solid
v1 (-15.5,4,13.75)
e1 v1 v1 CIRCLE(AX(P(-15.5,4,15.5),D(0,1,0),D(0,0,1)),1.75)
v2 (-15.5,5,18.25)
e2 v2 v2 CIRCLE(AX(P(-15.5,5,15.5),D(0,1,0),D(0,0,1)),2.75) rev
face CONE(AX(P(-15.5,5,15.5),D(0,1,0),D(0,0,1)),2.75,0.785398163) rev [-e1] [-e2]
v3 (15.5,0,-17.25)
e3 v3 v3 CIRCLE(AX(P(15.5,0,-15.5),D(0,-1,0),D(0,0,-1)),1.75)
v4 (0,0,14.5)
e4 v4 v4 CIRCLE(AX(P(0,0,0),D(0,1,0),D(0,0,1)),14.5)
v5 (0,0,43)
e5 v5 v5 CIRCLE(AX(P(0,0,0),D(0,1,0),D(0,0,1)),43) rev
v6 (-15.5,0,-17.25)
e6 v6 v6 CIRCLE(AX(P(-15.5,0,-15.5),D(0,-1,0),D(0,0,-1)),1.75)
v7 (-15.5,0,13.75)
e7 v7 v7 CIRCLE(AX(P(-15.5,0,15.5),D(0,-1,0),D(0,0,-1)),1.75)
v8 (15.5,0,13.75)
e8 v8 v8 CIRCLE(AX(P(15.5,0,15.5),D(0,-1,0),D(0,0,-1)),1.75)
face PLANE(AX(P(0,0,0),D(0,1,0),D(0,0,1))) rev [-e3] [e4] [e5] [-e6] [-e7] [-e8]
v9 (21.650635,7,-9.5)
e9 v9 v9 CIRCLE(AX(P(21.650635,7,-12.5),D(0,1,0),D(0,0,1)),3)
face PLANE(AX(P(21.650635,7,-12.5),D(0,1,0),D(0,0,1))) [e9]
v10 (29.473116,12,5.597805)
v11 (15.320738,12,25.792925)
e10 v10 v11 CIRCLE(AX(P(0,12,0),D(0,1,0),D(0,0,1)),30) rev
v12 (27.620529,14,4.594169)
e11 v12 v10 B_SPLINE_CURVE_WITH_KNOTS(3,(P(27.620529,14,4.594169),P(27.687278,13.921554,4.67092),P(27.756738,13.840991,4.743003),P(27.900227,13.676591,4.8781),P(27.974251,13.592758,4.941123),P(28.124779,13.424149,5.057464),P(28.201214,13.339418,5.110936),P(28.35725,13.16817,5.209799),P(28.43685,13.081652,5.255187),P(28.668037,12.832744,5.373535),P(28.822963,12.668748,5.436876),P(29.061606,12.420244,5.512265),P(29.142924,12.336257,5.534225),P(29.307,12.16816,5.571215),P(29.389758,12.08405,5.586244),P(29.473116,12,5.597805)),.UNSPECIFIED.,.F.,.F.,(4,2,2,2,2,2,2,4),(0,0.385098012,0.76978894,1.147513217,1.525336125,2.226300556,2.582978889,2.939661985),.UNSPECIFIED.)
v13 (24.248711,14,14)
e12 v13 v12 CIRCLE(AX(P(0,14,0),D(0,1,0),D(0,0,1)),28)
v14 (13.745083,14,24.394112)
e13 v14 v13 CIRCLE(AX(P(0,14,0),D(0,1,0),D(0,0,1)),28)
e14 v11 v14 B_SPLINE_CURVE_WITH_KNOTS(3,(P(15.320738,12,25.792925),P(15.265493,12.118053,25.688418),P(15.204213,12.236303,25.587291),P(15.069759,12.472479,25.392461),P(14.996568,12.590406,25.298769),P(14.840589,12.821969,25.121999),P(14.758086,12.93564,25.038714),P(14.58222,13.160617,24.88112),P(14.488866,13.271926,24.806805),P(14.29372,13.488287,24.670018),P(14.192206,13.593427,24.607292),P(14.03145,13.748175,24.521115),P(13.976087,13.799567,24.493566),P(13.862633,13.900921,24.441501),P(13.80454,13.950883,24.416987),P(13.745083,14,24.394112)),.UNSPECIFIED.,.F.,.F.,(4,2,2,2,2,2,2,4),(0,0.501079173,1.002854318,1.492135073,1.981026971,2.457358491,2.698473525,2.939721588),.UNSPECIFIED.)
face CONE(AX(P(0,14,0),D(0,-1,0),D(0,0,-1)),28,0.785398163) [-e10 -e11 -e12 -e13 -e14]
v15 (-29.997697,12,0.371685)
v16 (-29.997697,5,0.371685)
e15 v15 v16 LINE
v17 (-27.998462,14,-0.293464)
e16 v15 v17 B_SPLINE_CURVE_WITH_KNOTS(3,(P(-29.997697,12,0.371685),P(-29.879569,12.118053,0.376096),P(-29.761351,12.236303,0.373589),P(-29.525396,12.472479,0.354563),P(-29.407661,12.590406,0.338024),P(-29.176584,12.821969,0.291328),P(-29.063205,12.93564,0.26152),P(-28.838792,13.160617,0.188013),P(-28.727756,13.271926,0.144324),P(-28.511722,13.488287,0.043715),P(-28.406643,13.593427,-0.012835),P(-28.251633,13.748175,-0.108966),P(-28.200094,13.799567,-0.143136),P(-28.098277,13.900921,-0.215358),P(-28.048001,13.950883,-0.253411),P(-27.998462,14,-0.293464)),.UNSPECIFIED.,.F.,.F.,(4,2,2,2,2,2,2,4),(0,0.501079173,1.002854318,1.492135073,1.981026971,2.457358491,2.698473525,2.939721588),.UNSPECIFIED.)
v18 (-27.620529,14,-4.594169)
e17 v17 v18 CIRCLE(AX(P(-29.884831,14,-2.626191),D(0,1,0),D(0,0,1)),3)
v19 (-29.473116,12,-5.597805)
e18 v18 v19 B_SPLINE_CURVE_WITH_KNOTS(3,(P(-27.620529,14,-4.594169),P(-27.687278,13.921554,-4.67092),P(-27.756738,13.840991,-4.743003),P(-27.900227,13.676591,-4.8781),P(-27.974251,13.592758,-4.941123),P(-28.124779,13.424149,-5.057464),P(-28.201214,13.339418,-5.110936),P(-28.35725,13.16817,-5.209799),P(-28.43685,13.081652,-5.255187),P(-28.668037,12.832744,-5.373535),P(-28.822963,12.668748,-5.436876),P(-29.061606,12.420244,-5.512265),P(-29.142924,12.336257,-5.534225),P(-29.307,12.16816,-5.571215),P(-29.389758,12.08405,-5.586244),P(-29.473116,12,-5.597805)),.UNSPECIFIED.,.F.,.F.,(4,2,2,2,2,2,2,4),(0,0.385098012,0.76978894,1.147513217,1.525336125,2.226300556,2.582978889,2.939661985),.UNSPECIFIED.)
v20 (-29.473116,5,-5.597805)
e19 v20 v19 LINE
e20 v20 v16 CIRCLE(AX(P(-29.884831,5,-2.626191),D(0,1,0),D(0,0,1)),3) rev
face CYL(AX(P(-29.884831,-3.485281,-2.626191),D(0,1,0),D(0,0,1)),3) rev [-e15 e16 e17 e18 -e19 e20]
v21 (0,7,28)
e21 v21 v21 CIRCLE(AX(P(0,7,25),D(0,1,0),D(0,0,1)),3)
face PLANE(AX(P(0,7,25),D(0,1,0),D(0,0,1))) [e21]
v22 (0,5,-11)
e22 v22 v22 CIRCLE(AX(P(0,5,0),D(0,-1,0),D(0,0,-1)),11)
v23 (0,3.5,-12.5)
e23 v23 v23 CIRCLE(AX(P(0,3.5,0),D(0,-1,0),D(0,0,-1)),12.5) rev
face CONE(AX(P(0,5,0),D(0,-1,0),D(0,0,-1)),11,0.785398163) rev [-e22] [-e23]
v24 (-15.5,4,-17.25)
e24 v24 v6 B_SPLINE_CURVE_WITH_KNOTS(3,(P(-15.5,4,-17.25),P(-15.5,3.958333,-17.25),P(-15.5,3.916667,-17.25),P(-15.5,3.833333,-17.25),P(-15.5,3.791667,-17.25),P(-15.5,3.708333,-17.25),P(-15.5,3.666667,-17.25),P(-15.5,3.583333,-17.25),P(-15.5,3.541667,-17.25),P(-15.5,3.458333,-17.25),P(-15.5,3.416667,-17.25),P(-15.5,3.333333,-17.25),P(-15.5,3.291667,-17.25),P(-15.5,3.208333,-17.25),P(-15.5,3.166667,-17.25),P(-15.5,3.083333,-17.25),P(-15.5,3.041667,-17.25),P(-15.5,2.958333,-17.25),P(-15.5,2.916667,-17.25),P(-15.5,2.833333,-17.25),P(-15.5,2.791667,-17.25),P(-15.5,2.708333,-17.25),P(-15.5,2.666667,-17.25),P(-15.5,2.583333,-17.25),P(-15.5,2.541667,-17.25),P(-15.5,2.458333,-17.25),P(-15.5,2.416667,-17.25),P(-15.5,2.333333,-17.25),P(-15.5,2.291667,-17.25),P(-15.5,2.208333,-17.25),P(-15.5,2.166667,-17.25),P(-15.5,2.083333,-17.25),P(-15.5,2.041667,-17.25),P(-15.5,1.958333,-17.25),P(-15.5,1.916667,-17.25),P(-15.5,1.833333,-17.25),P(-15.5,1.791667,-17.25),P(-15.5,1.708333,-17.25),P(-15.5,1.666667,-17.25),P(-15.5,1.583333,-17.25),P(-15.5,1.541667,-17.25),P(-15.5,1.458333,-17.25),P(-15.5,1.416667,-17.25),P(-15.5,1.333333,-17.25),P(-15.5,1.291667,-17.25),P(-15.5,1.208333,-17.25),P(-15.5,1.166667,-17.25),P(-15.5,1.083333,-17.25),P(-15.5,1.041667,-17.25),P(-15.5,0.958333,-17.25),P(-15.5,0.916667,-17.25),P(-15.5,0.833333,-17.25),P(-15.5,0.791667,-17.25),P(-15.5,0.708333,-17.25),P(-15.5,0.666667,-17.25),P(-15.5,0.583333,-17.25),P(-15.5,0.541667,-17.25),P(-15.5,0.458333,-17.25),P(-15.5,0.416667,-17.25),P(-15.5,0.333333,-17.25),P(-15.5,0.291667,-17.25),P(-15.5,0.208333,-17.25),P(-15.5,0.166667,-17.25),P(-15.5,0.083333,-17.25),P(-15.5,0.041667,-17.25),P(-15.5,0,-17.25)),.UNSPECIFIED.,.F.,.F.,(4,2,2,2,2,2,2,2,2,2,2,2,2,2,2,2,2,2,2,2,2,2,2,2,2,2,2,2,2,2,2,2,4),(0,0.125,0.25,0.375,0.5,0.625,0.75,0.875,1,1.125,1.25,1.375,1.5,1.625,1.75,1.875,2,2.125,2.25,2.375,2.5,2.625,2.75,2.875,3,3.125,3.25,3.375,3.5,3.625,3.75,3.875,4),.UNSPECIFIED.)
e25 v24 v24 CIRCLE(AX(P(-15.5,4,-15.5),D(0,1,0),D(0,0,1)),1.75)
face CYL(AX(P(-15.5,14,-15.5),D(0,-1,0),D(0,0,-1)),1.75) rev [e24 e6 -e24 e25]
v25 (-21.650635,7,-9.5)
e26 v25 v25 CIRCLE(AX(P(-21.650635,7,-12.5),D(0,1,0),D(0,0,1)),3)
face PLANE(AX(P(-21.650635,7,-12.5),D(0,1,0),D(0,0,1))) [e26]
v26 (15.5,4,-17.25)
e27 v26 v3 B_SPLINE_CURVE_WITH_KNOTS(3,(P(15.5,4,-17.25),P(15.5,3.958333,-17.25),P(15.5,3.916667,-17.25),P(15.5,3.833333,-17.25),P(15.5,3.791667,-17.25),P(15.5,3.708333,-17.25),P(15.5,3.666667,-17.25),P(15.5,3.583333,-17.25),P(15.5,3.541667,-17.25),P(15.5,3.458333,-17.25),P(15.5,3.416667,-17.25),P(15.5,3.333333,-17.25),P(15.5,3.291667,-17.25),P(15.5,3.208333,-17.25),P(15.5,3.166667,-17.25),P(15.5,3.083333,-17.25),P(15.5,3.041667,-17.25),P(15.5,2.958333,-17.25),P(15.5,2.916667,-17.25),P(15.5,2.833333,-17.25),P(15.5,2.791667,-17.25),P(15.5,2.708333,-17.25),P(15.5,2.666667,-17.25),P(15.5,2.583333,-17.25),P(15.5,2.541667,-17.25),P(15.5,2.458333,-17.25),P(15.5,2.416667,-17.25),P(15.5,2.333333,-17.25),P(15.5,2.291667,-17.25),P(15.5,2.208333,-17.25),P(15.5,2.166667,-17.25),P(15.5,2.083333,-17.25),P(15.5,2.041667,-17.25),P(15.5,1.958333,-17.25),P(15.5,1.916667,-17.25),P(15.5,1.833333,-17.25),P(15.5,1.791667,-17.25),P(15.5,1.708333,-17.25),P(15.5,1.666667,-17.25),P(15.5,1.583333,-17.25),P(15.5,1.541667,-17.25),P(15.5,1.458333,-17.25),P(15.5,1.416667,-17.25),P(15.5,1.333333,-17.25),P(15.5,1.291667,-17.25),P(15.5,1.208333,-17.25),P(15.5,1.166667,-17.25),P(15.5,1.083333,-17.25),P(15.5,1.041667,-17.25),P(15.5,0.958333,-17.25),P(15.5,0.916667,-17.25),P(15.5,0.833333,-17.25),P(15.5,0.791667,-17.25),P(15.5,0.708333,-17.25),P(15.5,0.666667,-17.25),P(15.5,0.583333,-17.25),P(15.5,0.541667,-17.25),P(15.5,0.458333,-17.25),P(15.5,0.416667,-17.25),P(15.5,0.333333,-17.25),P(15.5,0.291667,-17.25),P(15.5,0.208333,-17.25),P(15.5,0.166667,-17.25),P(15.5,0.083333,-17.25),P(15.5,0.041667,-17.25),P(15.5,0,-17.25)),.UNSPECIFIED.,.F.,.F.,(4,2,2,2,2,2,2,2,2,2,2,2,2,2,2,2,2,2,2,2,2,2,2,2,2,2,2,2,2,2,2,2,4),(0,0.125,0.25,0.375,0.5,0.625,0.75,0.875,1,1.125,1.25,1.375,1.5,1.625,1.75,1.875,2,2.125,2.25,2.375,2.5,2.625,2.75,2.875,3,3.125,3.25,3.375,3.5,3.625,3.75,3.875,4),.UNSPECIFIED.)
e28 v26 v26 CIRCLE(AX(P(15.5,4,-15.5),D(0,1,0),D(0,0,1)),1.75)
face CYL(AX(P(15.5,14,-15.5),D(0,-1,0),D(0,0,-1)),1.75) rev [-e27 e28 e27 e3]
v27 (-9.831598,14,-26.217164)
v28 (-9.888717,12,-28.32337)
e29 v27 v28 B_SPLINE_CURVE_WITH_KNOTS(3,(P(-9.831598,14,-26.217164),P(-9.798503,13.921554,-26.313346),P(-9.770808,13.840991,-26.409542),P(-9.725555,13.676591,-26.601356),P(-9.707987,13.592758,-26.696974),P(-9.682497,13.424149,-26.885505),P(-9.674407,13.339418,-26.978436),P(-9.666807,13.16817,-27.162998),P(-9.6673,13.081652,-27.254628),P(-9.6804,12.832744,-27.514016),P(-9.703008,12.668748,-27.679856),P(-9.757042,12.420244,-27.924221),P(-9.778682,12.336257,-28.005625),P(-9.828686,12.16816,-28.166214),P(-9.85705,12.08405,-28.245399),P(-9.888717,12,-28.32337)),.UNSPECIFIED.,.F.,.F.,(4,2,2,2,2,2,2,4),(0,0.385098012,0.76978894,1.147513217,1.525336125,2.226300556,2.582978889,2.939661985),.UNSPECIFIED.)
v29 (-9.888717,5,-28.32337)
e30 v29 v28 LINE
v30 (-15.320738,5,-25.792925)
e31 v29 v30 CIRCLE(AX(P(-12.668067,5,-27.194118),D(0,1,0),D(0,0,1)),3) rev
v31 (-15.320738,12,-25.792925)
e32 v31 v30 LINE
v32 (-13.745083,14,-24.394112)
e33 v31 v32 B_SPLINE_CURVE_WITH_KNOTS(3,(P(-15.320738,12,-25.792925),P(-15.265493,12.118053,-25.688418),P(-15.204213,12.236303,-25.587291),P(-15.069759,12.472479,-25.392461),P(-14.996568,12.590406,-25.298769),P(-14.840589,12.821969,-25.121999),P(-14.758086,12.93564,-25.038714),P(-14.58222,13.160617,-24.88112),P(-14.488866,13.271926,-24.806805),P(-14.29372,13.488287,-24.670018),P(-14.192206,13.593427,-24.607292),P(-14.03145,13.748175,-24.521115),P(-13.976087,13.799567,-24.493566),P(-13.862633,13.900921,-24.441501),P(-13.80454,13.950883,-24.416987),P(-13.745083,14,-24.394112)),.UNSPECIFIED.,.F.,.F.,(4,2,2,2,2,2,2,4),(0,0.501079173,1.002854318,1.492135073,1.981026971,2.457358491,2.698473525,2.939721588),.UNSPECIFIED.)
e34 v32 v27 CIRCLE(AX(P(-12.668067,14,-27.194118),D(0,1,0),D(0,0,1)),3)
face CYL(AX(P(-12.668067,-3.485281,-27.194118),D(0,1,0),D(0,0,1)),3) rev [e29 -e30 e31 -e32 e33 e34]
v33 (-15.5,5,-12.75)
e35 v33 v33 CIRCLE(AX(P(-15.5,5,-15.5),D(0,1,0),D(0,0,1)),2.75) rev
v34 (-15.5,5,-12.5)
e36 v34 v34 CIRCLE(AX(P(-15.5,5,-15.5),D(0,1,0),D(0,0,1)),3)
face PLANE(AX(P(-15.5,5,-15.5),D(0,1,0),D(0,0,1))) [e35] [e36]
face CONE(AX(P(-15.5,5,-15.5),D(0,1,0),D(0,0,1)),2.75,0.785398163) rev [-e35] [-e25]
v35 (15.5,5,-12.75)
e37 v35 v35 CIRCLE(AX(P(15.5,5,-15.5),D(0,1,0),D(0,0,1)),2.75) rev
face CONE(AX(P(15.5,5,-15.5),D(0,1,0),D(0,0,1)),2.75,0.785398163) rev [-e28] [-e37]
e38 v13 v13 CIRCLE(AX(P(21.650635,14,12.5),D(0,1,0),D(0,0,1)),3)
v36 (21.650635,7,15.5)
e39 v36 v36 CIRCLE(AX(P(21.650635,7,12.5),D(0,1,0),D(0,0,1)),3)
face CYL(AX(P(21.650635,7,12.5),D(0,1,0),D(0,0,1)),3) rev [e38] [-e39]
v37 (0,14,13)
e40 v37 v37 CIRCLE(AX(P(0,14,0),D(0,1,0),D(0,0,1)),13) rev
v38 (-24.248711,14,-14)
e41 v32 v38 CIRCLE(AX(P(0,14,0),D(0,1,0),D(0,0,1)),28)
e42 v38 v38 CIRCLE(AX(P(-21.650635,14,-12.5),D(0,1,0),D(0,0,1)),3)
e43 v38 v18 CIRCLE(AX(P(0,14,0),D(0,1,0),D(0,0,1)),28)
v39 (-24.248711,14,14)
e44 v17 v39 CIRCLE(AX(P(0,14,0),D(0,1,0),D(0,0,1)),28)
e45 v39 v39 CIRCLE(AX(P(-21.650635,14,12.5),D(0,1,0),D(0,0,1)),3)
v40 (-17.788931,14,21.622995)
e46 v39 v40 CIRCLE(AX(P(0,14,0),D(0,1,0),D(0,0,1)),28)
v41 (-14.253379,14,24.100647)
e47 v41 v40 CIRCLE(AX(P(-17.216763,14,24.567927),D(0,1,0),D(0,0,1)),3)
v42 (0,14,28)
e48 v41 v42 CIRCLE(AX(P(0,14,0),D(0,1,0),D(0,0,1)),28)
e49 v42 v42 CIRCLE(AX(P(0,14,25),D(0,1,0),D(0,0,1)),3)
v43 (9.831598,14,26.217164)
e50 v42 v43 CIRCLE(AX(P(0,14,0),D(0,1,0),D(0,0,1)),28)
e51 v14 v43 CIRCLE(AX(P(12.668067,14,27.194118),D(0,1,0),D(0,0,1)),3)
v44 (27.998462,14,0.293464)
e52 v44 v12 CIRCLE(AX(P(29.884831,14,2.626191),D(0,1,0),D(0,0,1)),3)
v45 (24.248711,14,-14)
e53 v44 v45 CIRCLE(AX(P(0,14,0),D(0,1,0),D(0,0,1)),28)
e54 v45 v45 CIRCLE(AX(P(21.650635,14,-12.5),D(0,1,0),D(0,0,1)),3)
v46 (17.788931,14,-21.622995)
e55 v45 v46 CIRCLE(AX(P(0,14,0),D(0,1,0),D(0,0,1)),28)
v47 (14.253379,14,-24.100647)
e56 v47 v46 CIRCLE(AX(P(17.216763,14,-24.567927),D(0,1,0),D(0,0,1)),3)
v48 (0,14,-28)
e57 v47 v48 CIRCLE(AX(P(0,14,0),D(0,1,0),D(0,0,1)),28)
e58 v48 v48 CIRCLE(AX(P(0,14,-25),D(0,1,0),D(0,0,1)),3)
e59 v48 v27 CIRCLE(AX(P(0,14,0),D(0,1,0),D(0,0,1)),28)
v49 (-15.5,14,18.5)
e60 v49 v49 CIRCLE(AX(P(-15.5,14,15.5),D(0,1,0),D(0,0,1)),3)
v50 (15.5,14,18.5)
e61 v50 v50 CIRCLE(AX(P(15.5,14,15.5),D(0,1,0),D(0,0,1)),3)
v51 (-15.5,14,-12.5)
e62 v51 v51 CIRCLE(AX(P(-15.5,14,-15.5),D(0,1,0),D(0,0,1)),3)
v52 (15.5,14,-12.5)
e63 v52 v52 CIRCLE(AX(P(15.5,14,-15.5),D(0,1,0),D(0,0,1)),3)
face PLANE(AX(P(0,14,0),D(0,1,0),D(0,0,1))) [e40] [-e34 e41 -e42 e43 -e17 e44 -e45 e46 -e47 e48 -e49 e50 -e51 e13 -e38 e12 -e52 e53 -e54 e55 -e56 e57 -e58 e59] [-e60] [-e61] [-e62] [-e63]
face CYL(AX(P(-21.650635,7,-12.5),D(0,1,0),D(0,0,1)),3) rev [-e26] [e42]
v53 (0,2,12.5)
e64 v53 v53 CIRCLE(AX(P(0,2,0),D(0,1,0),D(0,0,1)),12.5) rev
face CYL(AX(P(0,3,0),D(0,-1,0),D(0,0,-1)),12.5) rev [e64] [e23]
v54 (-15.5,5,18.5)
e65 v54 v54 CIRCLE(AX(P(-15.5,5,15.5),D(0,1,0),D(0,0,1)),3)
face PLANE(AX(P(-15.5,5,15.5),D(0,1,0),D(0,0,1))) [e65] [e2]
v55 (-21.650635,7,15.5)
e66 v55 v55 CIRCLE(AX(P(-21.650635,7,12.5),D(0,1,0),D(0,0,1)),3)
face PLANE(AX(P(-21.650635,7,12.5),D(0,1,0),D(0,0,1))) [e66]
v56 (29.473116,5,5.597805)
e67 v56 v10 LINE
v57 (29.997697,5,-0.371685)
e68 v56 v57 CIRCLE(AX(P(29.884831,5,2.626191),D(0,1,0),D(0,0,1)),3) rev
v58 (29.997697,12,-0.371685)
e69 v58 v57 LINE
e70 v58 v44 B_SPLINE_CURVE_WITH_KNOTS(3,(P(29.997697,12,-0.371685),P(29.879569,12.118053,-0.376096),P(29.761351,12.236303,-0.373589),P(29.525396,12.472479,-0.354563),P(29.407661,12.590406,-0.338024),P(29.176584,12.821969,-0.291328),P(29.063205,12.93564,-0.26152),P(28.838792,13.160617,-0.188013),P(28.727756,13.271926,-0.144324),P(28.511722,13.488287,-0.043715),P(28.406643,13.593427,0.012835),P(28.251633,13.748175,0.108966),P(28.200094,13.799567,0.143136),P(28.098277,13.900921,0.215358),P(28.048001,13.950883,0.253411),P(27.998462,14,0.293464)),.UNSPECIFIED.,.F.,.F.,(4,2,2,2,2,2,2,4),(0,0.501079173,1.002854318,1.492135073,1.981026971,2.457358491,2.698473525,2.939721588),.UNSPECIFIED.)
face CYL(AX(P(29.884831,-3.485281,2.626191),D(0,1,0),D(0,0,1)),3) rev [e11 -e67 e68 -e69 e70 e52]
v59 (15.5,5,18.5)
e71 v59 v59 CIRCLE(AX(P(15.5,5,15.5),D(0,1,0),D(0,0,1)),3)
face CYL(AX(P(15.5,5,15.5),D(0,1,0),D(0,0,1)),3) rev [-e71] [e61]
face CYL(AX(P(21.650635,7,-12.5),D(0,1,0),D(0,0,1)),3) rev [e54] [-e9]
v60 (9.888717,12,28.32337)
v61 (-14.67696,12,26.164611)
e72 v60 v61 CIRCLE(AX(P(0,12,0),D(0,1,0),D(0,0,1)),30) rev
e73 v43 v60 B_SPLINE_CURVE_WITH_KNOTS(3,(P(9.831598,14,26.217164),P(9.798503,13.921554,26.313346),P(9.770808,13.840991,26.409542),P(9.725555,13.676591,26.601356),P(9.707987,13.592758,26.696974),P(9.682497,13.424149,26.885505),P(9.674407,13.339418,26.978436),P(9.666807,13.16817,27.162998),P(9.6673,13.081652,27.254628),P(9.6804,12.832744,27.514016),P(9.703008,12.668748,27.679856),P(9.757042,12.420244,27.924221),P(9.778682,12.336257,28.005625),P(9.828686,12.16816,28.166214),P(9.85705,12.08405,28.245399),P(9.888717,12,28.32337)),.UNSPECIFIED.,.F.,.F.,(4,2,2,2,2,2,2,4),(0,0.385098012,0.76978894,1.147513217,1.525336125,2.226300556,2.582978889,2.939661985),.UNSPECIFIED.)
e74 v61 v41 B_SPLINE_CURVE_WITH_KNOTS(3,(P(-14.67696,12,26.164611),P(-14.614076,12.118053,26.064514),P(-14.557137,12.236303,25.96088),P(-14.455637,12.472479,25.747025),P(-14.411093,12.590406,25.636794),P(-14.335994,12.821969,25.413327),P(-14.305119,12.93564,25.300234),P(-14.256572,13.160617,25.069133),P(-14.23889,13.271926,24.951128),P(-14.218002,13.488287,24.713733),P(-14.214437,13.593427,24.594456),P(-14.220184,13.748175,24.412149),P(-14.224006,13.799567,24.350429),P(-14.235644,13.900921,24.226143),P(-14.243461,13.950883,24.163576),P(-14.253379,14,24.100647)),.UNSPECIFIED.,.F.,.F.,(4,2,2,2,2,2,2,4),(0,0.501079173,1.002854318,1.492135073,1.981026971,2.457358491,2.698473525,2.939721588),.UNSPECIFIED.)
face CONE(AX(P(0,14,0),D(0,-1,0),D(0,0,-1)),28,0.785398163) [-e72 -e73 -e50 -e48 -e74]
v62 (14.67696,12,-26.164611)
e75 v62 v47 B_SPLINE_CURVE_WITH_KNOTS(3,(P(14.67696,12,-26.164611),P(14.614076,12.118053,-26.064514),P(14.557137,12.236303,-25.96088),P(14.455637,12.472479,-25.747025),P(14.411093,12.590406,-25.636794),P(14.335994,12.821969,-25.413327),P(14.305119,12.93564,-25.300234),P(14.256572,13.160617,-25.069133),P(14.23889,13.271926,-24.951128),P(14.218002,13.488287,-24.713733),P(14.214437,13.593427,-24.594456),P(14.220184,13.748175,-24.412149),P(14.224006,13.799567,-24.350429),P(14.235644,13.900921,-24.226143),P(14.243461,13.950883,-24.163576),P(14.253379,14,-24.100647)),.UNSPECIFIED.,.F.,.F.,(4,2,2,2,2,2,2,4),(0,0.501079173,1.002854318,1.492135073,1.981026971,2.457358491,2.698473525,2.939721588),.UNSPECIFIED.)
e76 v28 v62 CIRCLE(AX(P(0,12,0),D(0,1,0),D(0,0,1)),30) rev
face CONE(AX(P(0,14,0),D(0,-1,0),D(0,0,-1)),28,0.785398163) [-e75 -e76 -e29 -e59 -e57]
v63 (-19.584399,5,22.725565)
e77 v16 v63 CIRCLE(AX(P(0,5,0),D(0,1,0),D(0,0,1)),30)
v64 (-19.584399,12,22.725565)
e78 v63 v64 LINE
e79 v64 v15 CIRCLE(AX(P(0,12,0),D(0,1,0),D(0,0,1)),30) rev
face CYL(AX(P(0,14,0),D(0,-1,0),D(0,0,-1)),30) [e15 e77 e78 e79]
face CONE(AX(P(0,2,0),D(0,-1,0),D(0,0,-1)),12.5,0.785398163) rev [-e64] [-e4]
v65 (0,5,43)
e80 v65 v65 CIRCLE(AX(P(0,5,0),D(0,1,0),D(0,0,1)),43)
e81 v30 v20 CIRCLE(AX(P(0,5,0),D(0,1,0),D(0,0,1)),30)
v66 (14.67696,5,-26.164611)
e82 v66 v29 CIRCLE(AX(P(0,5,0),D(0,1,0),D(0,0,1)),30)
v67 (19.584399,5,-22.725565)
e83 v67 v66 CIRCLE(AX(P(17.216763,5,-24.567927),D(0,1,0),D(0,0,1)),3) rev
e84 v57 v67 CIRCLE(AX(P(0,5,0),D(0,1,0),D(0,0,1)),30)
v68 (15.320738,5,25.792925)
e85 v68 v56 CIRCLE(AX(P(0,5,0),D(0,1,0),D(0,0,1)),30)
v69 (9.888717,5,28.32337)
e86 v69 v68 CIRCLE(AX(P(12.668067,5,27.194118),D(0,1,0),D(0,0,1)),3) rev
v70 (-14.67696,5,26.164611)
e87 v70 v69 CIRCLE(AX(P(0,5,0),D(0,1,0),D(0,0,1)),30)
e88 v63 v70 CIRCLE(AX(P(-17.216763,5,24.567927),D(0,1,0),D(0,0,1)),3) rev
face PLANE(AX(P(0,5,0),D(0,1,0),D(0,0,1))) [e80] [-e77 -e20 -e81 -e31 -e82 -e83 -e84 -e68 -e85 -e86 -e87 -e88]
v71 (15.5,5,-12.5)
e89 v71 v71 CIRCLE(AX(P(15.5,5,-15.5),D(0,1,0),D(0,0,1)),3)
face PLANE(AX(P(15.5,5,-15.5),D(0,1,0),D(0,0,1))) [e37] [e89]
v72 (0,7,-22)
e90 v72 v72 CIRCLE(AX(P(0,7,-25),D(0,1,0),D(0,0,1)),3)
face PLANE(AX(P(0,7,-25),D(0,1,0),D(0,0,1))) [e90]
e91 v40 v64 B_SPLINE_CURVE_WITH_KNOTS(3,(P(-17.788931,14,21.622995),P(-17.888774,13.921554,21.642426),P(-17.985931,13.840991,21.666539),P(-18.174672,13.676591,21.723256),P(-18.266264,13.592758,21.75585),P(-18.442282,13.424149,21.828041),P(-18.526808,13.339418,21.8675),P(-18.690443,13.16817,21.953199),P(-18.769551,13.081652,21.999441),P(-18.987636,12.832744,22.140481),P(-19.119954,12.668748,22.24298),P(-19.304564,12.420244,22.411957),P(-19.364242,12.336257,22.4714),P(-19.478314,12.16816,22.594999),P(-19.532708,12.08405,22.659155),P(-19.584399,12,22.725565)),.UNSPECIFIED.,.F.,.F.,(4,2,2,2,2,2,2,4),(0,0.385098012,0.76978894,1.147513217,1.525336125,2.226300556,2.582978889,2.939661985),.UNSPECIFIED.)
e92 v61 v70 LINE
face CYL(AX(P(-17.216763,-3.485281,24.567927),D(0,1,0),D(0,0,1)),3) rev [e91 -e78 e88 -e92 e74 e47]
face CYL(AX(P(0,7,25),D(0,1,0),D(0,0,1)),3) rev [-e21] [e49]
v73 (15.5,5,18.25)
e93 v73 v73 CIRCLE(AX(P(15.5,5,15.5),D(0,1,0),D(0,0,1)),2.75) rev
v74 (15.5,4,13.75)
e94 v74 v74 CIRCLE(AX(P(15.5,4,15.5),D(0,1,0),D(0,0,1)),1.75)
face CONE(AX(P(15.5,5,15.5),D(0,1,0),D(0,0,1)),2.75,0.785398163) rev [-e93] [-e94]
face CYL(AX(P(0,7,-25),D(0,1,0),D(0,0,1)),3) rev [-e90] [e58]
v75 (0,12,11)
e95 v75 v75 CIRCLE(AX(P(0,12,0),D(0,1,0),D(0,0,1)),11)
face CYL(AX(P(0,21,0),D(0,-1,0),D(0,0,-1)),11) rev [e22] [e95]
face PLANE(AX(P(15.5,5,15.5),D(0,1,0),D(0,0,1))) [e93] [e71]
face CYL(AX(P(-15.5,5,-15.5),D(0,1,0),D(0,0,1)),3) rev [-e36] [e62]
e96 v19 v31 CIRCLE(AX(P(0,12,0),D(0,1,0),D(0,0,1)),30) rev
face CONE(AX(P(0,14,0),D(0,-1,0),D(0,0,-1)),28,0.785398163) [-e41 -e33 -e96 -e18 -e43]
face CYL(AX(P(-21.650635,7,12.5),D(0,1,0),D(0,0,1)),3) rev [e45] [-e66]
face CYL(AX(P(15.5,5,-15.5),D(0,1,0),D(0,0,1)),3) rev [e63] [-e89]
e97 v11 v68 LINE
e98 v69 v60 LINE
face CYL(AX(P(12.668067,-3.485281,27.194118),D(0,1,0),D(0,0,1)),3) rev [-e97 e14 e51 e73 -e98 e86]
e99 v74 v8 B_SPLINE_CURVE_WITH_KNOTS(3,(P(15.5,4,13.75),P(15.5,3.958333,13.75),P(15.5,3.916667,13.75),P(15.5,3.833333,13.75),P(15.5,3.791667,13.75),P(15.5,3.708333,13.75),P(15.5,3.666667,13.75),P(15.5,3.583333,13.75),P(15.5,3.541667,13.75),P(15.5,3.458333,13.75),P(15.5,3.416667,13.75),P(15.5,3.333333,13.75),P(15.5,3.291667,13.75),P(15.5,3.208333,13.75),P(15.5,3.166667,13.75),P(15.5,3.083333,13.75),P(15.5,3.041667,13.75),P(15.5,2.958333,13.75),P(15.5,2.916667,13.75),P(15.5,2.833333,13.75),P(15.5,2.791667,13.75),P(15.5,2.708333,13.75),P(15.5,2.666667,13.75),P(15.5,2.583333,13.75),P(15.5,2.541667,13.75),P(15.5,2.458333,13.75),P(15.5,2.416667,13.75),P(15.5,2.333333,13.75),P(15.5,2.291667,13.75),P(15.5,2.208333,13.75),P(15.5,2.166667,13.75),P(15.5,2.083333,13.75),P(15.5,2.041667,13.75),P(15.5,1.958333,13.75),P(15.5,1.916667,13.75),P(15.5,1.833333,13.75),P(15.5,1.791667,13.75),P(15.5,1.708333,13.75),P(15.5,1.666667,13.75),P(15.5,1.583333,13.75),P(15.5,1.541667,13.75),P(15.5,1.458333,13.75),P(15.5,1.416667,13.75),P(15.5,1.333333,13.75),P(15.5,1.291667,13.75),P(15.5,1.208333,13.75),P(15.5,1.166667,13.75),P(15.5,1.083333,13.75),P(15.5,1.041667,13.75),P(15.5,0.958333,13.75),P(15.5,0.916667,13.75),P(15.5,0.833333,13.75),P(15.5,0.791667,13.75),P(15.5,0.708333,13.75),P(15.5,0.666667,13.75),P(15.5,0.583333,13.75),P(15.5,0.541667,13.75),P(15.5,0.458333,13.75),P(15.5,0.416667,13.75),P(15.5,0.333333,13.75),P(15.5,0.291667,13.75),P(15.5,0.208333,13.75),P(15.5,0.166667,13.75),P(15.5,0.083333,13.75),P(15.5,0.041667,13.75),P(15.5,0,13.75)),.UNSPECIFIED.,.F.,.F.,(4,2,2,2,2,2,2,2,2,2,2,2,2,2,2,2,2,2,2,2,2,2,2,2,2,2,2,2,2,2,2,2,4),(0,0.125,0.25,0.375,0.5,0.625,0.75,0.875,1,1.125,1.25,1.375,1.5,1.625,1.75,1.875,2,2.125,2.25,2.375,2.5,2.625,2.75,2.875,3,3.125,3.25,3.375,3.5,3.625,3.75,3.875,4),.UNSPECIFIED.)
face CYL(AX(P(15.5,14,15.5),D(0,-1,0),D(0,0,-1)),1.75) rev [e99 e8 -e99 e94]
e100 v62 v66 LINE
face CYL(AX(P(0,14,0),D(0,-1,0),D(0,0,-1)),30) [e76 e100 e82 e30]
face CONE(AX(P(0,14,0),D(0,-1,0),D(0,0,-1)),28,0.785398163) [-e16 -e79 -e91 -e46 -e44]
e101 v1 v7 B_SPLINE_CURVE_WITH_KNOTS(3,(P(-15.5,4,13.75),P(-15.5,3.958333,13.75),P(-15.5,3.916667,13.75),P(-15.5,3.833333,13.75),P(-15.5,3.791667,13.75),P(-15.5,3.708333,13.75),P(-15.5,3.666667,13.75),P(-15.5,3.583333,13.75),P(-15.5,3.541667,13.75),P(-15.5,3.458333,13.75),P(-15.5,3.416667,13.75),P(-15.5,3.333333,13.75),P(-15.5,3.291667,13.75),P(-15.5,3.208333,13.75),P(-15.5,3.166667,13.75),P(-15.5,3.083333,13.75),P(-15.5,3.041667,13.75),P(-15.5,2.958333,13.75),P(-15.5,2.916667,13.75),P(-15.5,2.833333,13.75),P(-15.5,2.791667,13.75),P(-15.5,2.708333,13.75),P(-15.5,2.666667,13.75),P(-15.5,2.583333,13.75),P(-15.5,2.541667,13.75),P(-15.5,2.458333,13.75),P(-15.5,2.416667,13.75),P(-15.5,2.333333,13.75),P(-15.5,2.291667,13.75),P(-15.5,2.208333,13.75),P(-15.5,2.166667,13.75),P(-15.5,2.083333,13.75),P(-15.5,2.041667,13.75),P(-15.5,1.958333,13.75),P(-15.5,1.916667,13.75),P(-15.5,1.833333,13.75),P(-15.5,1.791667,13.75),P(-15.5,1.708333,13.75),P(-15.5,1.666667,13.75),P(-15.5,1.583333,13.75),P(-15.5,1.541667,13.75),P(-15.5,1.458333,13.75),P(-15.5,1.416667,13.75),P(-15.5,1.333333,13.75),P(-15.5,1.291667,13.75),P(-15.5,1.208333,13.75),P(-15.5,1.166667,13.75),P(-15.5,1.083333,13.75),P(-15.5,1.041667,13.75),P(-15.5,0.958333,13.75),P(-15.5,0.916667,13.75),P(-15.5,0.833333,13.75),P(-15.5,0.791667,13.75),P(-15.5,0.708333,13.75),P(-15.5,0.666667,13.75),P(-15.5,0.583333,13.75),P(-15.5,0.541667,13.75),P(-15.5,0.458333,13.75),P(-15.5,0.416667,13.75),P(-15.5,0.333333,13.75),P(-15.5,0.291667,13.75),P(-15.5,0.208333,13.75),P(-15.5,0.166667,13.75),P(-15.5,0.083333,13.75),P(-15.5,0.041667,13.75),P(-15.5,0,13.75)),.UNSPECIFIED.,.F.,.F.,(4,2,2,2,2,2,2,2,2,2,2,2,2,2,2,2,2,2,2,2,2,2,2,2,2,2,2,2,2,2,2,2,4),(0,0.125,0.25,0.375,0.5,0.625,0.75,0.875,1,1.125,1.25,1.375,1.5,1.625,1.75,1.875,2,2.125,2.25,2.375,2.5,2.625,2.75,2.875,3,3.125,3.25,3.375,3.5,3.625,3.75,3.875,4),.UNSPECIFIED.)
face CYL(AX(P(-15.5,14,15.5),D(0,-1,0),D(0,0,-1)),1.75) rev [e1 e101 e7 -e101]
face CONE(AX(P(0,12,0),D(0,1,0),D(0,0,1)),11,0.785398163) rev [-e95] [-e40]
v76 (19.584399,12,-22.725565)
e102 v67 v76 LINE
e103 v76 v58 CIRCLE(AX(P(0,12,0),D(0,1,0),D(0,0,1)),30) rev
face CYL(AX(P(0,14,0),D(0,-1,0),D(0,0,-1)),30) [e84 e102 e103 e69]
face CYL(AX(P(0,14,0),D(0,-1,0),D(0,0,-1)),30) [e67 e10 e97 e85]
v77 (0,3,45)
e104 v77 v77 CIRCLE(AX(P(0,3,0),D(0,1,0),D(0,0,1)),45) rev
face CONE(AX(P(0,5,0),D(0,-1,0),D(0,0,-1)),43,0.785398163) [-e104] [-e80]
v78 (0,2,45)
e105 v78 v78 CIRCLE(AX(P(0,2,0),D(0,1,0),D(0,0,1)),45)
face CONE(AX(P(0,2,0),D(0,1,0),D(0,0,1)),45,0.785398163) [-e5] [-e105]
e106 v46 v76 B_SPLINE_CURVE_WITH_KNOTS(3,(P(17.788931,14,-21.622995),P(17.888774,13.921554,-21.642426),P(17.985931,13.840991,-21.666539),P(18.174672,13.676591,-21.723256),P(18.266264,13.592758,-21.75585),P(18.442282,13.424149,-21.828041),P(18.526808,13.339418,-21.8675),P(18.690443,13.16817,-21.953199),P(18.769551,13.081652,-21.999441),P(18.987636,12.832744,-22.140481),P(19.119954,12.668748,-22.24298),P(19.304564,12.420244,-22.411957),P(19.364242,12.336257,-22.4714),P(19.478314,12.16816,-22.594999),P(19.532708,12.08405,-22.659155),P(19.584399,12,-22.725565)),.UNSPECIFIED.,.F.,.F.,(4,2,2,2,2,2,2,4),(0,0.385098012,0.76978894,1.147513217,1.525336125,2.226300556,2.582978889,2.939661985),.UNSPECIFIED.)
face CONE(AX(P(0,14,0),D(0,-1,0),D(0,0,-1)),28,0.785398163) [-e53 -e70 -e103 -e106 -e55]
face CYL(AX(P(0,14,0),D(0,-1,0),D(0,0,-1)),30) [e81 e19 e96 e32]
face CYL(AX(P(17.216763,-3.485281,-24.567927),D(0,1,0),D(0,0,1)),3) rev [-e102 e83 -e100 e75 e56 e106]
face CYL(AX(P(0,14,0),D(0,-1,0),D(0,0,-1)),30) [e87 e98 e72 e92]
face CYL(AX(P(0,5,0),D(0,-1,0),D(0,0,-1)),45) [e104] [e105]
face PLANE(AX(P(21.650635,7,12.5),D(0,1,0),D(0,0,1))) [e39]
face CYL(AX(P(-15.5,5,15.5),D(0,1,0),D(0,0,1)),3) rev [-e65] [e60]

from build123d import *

# Parameters (mm, degrees)
SKETCH1_R           = 45
BOSS_EXTRUDE1_DEPTH = 5
SKETCH2_R           = 30
BOSS_EXTRUDE2_DEPTH = 9
CUT_EXTRUDE1_DEPTH  = 66.16133823057964
SKETCH4_R           = 12.5
CUT_EXTRUDE2_DEPTH  = 3
SKETCH5_R           = 11
CUT_EXTRUDE3_DEPTH  = 18.000000000000004
SKETCH10_R          = 2.9999999999999996
SKETCH10_R_2        = 2.999999999999998
SKETCH10_R_3        = 3.0000000000000004
SKETCH10_R_4        = 2.9999999999999982
SKETCH10_R_5        = 2.999999999999999
CUT_EXTRUDE4_DEPTH  = 7
SKETCH11_R          = 2.9999999999942024
SKETCH11_R_2        = 2.999999999999999
SKETCH11_R_3        = 3.000000000009364
SKETCH11_R_4        = 3.000000000013015
SKETCH11_R_5        = 3.000000000007377
SKETCH11_R_6        = 2.9999999999981304
CUT_EXTRUDE5_DEPTH  = 9
CHAMFER1_SIZE       = 2
CHAMFER2_SIZE       = 2
SKETCH12_R          = 2.999999999999999
SKETCH12_R_2        = 3.0000000000000004
CUT_EXTRUDE6_DEPTH  = 9
CHAMFER3_SIZE       = 1


with BuildPart() as part:
    # Sketch1 → Boss-Extrude1 (new body)
    with BuildSketch(Plane(origin=(0, 0, 0), x_dir=(1, 0, 0), z_dir=(0, 1, 0))):
        with Locations(Location((0, 0, 0), (0, 0, 270))):
            Circle(SKETCH1_R)
    extrude(amount=BOSS_EXTRUDE1_DEPTH)

    # Sketch2 → Boss-Extrude2 (add)
    with BuildSketch(Plane(origin=(0, 5, 0), x_dir=(1, 0, 0), z_dir=(0, 1, 0))):
        with Locations(Location((0, 0, 0), (0, 0, 270))):
            Circle(SKETCH2_R)
    extrude(amount=BOSS_EXTRUDE2_DEPTH)

    # Sketch3 → Cut-Extrude1 (cut, through all)
    with BuildSketch(Plane.XZ):
        with BuildLine():
            ThreePointArc((17.25, 15.499999999999996), (15.5, 17.249999999999996), (13.75, 15.499999999999996))
            Line((13.75, 15.499999999999996), (15.5, 15.499999999999996))
            Line((15.5, 15.499999999999996), (15.5, 13.749999999999996))
            ThreePointArc((15.499999999999975, 13.749999999999996), (16.73743686707645, 14.262563132923528), (17.25, 15.499999999999996))
        make_face()
        with BuildLine():
            Line((15.5, 15.499999999999996), (13.75, 15.499999999999996))
            ThreePointArc((13.75, 15.499999999999996), (14.262563132923532, 14.262563132923546), (15.499999999999975, 13.749999999999996))
            Line((15.5, 13.749999999999996), (15.5, 15.499999999999996))
        make_face()
        with BuildLine():
            ThreePointArc((17.25, -15.500000000000004), (16.73743686707645, -14.262563132923537), (15.499999999999975, -13.750000000000005))
            Line((15.500000000000002, -13.750000000000004), (15.500000000000002, -15.500000000000004))
            Line((15.500000000000004, -15.500000000000004), (13.750000000000004, -15.500000000000004))
            ThreePointArc((13.750000000000004, -15.500000000000004), (15.500000000000002, -17.25), (17.25, -15.500000000000004))
        make_face()
        with BuildLine():
            Line((15.500000000000002, -15.500000000000004), (15.500000000000002, -13.750000000000004))
            ThreePointArc((15.499999999999975, -13.750000000000005), (14.262563132923535, -14.262563132923557), (13.750000000000004, -15.500000000000004))
            Line((13.750000000000004, -15.500000000000004), (15.500000000000004, -15.500000000000004))
        make_face()
        with BuildLine():
            ThreePointArc((-13.749999999999996, -15.500000000000004), (-14.262563132923548, -14.262563132923537), (-15.500000000000021, -13.750000000000004))
            Line((-15.499999999999996, -13.750000000000004), (-15.499999999999996, -15.500000000000004))
            Line((-15.499999999999996, -15.500000000000004), (-13.749999999999996, -15.500000000000004))
        make_face()
        with BuildLine():
            Line((-15.499999999999996, -15.500000000000004), (-15.499999999999996, -13.750000000000004))
            ThreePointArc((-15.500000000000021, -13.750000000000004), (-16.737436867076447, -16.73743686707647), (-13.749999999999996, -15.500000000000004))
            Line((-13.749999999999996, -15.500000000000004), (-15.499999999999996, -15.500000000000004))
        make_face()
        with BuildLine():
            Line((-15.5, 13.749999999999996), (-15.5, 15.499999999999996))
            Line((-15.5, 15.499999999999996), (-13.75, 15.499999999999996))
            ThreePointArc((-13.75, 15.499999999999996), (-16.73743686707645, 16.737436867076465), (-15.500000000000025, 13.749999999999996))
        make_face()
        with BuildLine():
            Line((-13.75, 15.499999999999996), (-15.5, 15.499999999999996))
            Line((-15.5, 15.499999999999996), (-15.5, 13.749999999999996))
            ThreePointArc((-15.500000000000025, 13.749999999999996), (-14.26256313292355, 14.262563132923528), (-13.75, 15.499999999999996))
        make_face()
    extrude(amount=-CUT_EXTRUDE1_DEPTH, mode=Mode.SUBTRACT)

    # Sketch4 → Cut-Extrude2 (cut)
    with BuildSketch(Plane.XZ):
        with Locations(Location((0, 0, 0), (0, 0, 270))):
            Circle(SKETCH4_R)
    extrude(amount=-CUT_EXTRUDE2_DEPTH, mode=Mode.SUBTRACT)

    # Sketch5 → Cut-Extrude3 (cut)
    with BuildSketch(Plane.XZ.offset(-3)):
        with Locations(Location((0, 0, 0), (0, 0, 270))):
            Circle(SKETCH5_R)
    extrude(amount=-CUT_EXTRUDE3_DEPTH, mode=Mode.SUBTRACT)

    # Sketch10 → Cut-Extrude4 (cut)
    with BuildSketch(Plane(origin=(0, 13.999999999999998, 0), x_dir=(1, 0, 0), z_dir=(0, 1, 0))):
        with Locations(Location((0, 25, 0), (0, 0, 270))):
            Circle(SKETCH10_R)
        with Locations(Location((21.650635094610998, 12.49999999999995, 0), (0, 0, 270))):
            Circle(SKETCH10_R_2)
        with Locations(Location((21.650635094610916, -12.500000000000105, 0), (0, 0, 270))):
            Circle(SKETCH10_R_3)
        with Locations(Location((-1.7457e-13, -25, 0), (0, 0, 270))):
            Circle(SKETCH10_R)
        with Locations(Location((-21.65063509461109, -12.499999999999801, 0), (0, 0, 270))):
            Circle(SKETCH10_R_4)
        with Locations(Location((-21.65063509461082, 12.500000000000254, 0), (0, 0, 270))):
            Circle(SKETCH10_R_5)
    extrude(amount=-CUT_EXTRUDE4_DEPTH, mode=Mode.SUBTRACT)

    # Sketch11 → Cut-Extrude5 (cut)
    with BuildSketch(Plane(origin=(0, 13.999999999999998, 0), x_dir=(1, 0, 0), z_dir=(0, 1, 0))):
        with Locations((-12.668067495255341, 27.194118223159318)):
            Circle(SKETCH11_R)
        with Locations((17.216763467146524, 24.567927379336027)):
            Circle(SKETCH11_R_2)
        with Locations((29.88483096241041, -2.6261908438193853)):
            Circle(SKETCH11_R_3)
        with Locations((12.668067495272416, -27.194118223151523)):
            Circle(SKETCH11_R_4)
        with Locations((-17.216763467129454, -24.567927379328246)):
            Circle(SKETCH11_R_5)
        with Locations((-29.884830962393337, 2.626190843827188)):
            Circle(SKETCH11_R_6)
    extrude(amount=-CUT_EXTRUDE5_DEPTH, mode=Mode.SUBTRACT)

    # Chamfer1
    chamfer1_edges = [part.edges().sort_by_distance(p)[0] for p in [
        (1.378e-14, 0, -45),
        (1.378e-14, 5, -45),
    ]]
    chamfer(chamfer1_edges, length=CHAMFER1_SIZE)

    # Chamfer2
    # the kernel refuses this chamfer: 2 mm, written as the material it takes off along each edge
    with BuildSketch(Plane(origin=(0, 0, 0), x_dir=(-1.8e-16, 0, -1), z_dir=(-1, 0, 1.8e-16))) as chamfer2_piece_1:
        Polygon((12.5 + CHAMFER2_SIZE, 0), (12.5, -CHAMFER2_SIZE), (12.5, 0), align=None)
    revolve(axis=Axis((0, 0, 0), (0, -1, 0)), mode=Mode.SUBTRACT)
    with BuildSketch(Plane(origin=(0, 3, 0), x_dir=(-1.8e-16, 0, -1), z_dir=(-1, 0, 1.8e-16))) as chamfer2_piece_2_section:
        Polygon((11 + CHAMFER2_SIZE, 0), (11, -CHAMFER2_SIZE), (11, 0), align=None)
    chamfer2_piece_2 = revolve(axis=Axis((0, 3, 0), (0, -1, 0)), mode=Mode.PRIVATE)
    chamfer2_piece_2 = chamfer2_piece_2 & Plane(origin=(0, 4.240881281670706, 0), x_dir=(-1.8e-16, 0, -1), z_dir=(0, -1, 0)) * Cylinder(12.5, 52, mode=Mode.PRIVATE)
    add(chamfer2_piece_2, mode=Mode.SUBTRACT)
    with BuildSketch(Plane(origin=(0, 14, 0), x_dir=(-1.8e-16, 0, -1), z_dir=(-1, 0, 1.8e-16))) as chamfer2_piece_3:
        Polygon((11 + CHAMFER2_SIZE, 0), (11, CHAMFER2_SIZE), (11, 0), align=None)
    revolve(axis=Axis((0, 14, 0), (0, -1, 0)), mode=Mode.SUBTRACT)
    with BuildSketch(Plane(origin=(0, 14, 0), x_dir=(0.4858808835663902, 0, 0.8740250379621536), z_dir=(0.8740250379621536, 0, -0.4858808835663902))) as chamfer2_piece_4:
        Polygon((30, CHAMFER2_SIZE), (30 - CHAMFER2_SIZE, 0), (30, 0), align=None)
    revolve(axis=Axis((0, 14, 0), (0, -1, 0)), revolution_arc=68.1845697415076, mode=Mode.SUBTRACT)
    with BuildSketch(Plane(origin=(0, 14, 0), x_dir=(0.35650371691977006, 0, 0.9342939044125186), z_dir=(-0.9342939044125186, 0, 0.35650371691977006))) as chamfer2_piece_5:
        Polygon((30.000000000000004, -CHAMFER2_SIZE), (30.000000000000004 - CHAMFER2_SIZE, 0), (30.000000000000004, 0), align=None)
    revolve(axis=Axis((0, 14, 0), (0, 1, 0)), revolution_arc=68.18456974148796, mode=Mode.SUBTRACT)
    with BuildSketch(Plane(origin=(0, 14, 0), x_dir=(0.9873741142820315, 0, 0.15840567681044143), z_dir=(-0.15840567681044143, 0, 0.9873741142820315))) as chamfer2_piece_6:
        Polygon((30, -CHAMFER2_SIZE), (30 - CHAMFER2_SIZE, 0), (30, 0), align=None)
    revolve(axis=Axis((0, 14, 0), (0, 1, 0)), revolution_arc=68.18456974150509, mode=Mode.SUBTRACT)
    with BuildSketch(Plane(origin=(0, 14, 0), x_dir=(0.6308703973630067, 0, -0.7758882276017869), z_dir=(0.7758882276017869, 0, 0.6308703973630067))) as chamfer2_piece_7:
        Polygon((30, -CHAMFER2_SIZE), (30 - CHAMFER2_SIZE, 0), (30, 0), align=None)
    revolve(axis=Axis((0, 14, 0), (0, 1, 0)), revolution_arc=68.18456974154147, mode=Mode.SUBTRACT)
    with BuildSketch(Plane(origin=(0, 14, 0), x_dir=(-0.3565037169185992, 0, -0.9342939044129653), z_dir=(0.9342939044129653, 0, -0.3565037169185992))) as chamfer2_piece_8:
        Polygon((30, -CHAMFER2_SIZE), (30 - CHAMFER2_SIZE, 0), (30, 0), align=None)
    revolve(axis=Axis((0, 14, 0), (0, 1, 0)), revolution_arc=68.18456974156156, mode=Mode.SUBTRACT)
    with BuildSketch(Plane(origin=(0, 14, 0), x_dir=(-0.9873741142819215, 0, -0.15840567681112622), z_dir=(0.15840567681112622, 0, -0.9873741142819215))) as chamfer2_piece_9:
        Polygon((29.999999999999996, -CHAMFER2_SIZE), (29.999999999999996 - CHAMFER2_SIZE, 0), (29.999999999999996, 0), align=None)
    revolve(axis=Axis((0, 14, 0), (0, 1, 0)), revolution_arc=68.18456974154742, mode=Mode.SUBTRACT)

    # Sketch12 → Cut-Extrude6 (cut)
    with BuildSketch(Plane(origin=(0, 13.999999999999998, 0), x_dir=(1, 0, 0), z_dir=(0, 1, 0))):
        with Locations(Location((-15.499999999999996, 15.500000000000004, 0), (0, 0, 270))):
            Circle(SKETCH12_R)
        with Locations(Location((15.500000000000002, 15.500000000000004, 0), (0, 0, 270))):
            Circle(SKETCH12_R)
        with Locations(Location((15.5, -15.499999999999996, 0), (0, 0, 270))):
            Circle(SKETCH12_R_2)
        with Locations(Location((-15.5, -15.499999999999996, 0), (0, 0, 270))):
            Circle(SKETCH12_R)
    extrude(amount=-CUT_EXTRUDE6_DEPTH, mode=Mode.SUBTRACT)

    # Chamfer3
    chamfer3_edges = [part.edges().sort_by_distance(p)[0] for p in [
        (-15.499999999999975, 4.999999999999998, 17.249999999999996),
        (17.25, 4.999999999999998, 15.499999999999991),
        (15.50000000000003, 4.999999999999998, -17.25),
        (-17.25, 4.999999999999998, -15.500000000000004),
    ]]
    chamfer(chamfer3_edges, length=CHAMFER3_SIZE)


solid = part.part
